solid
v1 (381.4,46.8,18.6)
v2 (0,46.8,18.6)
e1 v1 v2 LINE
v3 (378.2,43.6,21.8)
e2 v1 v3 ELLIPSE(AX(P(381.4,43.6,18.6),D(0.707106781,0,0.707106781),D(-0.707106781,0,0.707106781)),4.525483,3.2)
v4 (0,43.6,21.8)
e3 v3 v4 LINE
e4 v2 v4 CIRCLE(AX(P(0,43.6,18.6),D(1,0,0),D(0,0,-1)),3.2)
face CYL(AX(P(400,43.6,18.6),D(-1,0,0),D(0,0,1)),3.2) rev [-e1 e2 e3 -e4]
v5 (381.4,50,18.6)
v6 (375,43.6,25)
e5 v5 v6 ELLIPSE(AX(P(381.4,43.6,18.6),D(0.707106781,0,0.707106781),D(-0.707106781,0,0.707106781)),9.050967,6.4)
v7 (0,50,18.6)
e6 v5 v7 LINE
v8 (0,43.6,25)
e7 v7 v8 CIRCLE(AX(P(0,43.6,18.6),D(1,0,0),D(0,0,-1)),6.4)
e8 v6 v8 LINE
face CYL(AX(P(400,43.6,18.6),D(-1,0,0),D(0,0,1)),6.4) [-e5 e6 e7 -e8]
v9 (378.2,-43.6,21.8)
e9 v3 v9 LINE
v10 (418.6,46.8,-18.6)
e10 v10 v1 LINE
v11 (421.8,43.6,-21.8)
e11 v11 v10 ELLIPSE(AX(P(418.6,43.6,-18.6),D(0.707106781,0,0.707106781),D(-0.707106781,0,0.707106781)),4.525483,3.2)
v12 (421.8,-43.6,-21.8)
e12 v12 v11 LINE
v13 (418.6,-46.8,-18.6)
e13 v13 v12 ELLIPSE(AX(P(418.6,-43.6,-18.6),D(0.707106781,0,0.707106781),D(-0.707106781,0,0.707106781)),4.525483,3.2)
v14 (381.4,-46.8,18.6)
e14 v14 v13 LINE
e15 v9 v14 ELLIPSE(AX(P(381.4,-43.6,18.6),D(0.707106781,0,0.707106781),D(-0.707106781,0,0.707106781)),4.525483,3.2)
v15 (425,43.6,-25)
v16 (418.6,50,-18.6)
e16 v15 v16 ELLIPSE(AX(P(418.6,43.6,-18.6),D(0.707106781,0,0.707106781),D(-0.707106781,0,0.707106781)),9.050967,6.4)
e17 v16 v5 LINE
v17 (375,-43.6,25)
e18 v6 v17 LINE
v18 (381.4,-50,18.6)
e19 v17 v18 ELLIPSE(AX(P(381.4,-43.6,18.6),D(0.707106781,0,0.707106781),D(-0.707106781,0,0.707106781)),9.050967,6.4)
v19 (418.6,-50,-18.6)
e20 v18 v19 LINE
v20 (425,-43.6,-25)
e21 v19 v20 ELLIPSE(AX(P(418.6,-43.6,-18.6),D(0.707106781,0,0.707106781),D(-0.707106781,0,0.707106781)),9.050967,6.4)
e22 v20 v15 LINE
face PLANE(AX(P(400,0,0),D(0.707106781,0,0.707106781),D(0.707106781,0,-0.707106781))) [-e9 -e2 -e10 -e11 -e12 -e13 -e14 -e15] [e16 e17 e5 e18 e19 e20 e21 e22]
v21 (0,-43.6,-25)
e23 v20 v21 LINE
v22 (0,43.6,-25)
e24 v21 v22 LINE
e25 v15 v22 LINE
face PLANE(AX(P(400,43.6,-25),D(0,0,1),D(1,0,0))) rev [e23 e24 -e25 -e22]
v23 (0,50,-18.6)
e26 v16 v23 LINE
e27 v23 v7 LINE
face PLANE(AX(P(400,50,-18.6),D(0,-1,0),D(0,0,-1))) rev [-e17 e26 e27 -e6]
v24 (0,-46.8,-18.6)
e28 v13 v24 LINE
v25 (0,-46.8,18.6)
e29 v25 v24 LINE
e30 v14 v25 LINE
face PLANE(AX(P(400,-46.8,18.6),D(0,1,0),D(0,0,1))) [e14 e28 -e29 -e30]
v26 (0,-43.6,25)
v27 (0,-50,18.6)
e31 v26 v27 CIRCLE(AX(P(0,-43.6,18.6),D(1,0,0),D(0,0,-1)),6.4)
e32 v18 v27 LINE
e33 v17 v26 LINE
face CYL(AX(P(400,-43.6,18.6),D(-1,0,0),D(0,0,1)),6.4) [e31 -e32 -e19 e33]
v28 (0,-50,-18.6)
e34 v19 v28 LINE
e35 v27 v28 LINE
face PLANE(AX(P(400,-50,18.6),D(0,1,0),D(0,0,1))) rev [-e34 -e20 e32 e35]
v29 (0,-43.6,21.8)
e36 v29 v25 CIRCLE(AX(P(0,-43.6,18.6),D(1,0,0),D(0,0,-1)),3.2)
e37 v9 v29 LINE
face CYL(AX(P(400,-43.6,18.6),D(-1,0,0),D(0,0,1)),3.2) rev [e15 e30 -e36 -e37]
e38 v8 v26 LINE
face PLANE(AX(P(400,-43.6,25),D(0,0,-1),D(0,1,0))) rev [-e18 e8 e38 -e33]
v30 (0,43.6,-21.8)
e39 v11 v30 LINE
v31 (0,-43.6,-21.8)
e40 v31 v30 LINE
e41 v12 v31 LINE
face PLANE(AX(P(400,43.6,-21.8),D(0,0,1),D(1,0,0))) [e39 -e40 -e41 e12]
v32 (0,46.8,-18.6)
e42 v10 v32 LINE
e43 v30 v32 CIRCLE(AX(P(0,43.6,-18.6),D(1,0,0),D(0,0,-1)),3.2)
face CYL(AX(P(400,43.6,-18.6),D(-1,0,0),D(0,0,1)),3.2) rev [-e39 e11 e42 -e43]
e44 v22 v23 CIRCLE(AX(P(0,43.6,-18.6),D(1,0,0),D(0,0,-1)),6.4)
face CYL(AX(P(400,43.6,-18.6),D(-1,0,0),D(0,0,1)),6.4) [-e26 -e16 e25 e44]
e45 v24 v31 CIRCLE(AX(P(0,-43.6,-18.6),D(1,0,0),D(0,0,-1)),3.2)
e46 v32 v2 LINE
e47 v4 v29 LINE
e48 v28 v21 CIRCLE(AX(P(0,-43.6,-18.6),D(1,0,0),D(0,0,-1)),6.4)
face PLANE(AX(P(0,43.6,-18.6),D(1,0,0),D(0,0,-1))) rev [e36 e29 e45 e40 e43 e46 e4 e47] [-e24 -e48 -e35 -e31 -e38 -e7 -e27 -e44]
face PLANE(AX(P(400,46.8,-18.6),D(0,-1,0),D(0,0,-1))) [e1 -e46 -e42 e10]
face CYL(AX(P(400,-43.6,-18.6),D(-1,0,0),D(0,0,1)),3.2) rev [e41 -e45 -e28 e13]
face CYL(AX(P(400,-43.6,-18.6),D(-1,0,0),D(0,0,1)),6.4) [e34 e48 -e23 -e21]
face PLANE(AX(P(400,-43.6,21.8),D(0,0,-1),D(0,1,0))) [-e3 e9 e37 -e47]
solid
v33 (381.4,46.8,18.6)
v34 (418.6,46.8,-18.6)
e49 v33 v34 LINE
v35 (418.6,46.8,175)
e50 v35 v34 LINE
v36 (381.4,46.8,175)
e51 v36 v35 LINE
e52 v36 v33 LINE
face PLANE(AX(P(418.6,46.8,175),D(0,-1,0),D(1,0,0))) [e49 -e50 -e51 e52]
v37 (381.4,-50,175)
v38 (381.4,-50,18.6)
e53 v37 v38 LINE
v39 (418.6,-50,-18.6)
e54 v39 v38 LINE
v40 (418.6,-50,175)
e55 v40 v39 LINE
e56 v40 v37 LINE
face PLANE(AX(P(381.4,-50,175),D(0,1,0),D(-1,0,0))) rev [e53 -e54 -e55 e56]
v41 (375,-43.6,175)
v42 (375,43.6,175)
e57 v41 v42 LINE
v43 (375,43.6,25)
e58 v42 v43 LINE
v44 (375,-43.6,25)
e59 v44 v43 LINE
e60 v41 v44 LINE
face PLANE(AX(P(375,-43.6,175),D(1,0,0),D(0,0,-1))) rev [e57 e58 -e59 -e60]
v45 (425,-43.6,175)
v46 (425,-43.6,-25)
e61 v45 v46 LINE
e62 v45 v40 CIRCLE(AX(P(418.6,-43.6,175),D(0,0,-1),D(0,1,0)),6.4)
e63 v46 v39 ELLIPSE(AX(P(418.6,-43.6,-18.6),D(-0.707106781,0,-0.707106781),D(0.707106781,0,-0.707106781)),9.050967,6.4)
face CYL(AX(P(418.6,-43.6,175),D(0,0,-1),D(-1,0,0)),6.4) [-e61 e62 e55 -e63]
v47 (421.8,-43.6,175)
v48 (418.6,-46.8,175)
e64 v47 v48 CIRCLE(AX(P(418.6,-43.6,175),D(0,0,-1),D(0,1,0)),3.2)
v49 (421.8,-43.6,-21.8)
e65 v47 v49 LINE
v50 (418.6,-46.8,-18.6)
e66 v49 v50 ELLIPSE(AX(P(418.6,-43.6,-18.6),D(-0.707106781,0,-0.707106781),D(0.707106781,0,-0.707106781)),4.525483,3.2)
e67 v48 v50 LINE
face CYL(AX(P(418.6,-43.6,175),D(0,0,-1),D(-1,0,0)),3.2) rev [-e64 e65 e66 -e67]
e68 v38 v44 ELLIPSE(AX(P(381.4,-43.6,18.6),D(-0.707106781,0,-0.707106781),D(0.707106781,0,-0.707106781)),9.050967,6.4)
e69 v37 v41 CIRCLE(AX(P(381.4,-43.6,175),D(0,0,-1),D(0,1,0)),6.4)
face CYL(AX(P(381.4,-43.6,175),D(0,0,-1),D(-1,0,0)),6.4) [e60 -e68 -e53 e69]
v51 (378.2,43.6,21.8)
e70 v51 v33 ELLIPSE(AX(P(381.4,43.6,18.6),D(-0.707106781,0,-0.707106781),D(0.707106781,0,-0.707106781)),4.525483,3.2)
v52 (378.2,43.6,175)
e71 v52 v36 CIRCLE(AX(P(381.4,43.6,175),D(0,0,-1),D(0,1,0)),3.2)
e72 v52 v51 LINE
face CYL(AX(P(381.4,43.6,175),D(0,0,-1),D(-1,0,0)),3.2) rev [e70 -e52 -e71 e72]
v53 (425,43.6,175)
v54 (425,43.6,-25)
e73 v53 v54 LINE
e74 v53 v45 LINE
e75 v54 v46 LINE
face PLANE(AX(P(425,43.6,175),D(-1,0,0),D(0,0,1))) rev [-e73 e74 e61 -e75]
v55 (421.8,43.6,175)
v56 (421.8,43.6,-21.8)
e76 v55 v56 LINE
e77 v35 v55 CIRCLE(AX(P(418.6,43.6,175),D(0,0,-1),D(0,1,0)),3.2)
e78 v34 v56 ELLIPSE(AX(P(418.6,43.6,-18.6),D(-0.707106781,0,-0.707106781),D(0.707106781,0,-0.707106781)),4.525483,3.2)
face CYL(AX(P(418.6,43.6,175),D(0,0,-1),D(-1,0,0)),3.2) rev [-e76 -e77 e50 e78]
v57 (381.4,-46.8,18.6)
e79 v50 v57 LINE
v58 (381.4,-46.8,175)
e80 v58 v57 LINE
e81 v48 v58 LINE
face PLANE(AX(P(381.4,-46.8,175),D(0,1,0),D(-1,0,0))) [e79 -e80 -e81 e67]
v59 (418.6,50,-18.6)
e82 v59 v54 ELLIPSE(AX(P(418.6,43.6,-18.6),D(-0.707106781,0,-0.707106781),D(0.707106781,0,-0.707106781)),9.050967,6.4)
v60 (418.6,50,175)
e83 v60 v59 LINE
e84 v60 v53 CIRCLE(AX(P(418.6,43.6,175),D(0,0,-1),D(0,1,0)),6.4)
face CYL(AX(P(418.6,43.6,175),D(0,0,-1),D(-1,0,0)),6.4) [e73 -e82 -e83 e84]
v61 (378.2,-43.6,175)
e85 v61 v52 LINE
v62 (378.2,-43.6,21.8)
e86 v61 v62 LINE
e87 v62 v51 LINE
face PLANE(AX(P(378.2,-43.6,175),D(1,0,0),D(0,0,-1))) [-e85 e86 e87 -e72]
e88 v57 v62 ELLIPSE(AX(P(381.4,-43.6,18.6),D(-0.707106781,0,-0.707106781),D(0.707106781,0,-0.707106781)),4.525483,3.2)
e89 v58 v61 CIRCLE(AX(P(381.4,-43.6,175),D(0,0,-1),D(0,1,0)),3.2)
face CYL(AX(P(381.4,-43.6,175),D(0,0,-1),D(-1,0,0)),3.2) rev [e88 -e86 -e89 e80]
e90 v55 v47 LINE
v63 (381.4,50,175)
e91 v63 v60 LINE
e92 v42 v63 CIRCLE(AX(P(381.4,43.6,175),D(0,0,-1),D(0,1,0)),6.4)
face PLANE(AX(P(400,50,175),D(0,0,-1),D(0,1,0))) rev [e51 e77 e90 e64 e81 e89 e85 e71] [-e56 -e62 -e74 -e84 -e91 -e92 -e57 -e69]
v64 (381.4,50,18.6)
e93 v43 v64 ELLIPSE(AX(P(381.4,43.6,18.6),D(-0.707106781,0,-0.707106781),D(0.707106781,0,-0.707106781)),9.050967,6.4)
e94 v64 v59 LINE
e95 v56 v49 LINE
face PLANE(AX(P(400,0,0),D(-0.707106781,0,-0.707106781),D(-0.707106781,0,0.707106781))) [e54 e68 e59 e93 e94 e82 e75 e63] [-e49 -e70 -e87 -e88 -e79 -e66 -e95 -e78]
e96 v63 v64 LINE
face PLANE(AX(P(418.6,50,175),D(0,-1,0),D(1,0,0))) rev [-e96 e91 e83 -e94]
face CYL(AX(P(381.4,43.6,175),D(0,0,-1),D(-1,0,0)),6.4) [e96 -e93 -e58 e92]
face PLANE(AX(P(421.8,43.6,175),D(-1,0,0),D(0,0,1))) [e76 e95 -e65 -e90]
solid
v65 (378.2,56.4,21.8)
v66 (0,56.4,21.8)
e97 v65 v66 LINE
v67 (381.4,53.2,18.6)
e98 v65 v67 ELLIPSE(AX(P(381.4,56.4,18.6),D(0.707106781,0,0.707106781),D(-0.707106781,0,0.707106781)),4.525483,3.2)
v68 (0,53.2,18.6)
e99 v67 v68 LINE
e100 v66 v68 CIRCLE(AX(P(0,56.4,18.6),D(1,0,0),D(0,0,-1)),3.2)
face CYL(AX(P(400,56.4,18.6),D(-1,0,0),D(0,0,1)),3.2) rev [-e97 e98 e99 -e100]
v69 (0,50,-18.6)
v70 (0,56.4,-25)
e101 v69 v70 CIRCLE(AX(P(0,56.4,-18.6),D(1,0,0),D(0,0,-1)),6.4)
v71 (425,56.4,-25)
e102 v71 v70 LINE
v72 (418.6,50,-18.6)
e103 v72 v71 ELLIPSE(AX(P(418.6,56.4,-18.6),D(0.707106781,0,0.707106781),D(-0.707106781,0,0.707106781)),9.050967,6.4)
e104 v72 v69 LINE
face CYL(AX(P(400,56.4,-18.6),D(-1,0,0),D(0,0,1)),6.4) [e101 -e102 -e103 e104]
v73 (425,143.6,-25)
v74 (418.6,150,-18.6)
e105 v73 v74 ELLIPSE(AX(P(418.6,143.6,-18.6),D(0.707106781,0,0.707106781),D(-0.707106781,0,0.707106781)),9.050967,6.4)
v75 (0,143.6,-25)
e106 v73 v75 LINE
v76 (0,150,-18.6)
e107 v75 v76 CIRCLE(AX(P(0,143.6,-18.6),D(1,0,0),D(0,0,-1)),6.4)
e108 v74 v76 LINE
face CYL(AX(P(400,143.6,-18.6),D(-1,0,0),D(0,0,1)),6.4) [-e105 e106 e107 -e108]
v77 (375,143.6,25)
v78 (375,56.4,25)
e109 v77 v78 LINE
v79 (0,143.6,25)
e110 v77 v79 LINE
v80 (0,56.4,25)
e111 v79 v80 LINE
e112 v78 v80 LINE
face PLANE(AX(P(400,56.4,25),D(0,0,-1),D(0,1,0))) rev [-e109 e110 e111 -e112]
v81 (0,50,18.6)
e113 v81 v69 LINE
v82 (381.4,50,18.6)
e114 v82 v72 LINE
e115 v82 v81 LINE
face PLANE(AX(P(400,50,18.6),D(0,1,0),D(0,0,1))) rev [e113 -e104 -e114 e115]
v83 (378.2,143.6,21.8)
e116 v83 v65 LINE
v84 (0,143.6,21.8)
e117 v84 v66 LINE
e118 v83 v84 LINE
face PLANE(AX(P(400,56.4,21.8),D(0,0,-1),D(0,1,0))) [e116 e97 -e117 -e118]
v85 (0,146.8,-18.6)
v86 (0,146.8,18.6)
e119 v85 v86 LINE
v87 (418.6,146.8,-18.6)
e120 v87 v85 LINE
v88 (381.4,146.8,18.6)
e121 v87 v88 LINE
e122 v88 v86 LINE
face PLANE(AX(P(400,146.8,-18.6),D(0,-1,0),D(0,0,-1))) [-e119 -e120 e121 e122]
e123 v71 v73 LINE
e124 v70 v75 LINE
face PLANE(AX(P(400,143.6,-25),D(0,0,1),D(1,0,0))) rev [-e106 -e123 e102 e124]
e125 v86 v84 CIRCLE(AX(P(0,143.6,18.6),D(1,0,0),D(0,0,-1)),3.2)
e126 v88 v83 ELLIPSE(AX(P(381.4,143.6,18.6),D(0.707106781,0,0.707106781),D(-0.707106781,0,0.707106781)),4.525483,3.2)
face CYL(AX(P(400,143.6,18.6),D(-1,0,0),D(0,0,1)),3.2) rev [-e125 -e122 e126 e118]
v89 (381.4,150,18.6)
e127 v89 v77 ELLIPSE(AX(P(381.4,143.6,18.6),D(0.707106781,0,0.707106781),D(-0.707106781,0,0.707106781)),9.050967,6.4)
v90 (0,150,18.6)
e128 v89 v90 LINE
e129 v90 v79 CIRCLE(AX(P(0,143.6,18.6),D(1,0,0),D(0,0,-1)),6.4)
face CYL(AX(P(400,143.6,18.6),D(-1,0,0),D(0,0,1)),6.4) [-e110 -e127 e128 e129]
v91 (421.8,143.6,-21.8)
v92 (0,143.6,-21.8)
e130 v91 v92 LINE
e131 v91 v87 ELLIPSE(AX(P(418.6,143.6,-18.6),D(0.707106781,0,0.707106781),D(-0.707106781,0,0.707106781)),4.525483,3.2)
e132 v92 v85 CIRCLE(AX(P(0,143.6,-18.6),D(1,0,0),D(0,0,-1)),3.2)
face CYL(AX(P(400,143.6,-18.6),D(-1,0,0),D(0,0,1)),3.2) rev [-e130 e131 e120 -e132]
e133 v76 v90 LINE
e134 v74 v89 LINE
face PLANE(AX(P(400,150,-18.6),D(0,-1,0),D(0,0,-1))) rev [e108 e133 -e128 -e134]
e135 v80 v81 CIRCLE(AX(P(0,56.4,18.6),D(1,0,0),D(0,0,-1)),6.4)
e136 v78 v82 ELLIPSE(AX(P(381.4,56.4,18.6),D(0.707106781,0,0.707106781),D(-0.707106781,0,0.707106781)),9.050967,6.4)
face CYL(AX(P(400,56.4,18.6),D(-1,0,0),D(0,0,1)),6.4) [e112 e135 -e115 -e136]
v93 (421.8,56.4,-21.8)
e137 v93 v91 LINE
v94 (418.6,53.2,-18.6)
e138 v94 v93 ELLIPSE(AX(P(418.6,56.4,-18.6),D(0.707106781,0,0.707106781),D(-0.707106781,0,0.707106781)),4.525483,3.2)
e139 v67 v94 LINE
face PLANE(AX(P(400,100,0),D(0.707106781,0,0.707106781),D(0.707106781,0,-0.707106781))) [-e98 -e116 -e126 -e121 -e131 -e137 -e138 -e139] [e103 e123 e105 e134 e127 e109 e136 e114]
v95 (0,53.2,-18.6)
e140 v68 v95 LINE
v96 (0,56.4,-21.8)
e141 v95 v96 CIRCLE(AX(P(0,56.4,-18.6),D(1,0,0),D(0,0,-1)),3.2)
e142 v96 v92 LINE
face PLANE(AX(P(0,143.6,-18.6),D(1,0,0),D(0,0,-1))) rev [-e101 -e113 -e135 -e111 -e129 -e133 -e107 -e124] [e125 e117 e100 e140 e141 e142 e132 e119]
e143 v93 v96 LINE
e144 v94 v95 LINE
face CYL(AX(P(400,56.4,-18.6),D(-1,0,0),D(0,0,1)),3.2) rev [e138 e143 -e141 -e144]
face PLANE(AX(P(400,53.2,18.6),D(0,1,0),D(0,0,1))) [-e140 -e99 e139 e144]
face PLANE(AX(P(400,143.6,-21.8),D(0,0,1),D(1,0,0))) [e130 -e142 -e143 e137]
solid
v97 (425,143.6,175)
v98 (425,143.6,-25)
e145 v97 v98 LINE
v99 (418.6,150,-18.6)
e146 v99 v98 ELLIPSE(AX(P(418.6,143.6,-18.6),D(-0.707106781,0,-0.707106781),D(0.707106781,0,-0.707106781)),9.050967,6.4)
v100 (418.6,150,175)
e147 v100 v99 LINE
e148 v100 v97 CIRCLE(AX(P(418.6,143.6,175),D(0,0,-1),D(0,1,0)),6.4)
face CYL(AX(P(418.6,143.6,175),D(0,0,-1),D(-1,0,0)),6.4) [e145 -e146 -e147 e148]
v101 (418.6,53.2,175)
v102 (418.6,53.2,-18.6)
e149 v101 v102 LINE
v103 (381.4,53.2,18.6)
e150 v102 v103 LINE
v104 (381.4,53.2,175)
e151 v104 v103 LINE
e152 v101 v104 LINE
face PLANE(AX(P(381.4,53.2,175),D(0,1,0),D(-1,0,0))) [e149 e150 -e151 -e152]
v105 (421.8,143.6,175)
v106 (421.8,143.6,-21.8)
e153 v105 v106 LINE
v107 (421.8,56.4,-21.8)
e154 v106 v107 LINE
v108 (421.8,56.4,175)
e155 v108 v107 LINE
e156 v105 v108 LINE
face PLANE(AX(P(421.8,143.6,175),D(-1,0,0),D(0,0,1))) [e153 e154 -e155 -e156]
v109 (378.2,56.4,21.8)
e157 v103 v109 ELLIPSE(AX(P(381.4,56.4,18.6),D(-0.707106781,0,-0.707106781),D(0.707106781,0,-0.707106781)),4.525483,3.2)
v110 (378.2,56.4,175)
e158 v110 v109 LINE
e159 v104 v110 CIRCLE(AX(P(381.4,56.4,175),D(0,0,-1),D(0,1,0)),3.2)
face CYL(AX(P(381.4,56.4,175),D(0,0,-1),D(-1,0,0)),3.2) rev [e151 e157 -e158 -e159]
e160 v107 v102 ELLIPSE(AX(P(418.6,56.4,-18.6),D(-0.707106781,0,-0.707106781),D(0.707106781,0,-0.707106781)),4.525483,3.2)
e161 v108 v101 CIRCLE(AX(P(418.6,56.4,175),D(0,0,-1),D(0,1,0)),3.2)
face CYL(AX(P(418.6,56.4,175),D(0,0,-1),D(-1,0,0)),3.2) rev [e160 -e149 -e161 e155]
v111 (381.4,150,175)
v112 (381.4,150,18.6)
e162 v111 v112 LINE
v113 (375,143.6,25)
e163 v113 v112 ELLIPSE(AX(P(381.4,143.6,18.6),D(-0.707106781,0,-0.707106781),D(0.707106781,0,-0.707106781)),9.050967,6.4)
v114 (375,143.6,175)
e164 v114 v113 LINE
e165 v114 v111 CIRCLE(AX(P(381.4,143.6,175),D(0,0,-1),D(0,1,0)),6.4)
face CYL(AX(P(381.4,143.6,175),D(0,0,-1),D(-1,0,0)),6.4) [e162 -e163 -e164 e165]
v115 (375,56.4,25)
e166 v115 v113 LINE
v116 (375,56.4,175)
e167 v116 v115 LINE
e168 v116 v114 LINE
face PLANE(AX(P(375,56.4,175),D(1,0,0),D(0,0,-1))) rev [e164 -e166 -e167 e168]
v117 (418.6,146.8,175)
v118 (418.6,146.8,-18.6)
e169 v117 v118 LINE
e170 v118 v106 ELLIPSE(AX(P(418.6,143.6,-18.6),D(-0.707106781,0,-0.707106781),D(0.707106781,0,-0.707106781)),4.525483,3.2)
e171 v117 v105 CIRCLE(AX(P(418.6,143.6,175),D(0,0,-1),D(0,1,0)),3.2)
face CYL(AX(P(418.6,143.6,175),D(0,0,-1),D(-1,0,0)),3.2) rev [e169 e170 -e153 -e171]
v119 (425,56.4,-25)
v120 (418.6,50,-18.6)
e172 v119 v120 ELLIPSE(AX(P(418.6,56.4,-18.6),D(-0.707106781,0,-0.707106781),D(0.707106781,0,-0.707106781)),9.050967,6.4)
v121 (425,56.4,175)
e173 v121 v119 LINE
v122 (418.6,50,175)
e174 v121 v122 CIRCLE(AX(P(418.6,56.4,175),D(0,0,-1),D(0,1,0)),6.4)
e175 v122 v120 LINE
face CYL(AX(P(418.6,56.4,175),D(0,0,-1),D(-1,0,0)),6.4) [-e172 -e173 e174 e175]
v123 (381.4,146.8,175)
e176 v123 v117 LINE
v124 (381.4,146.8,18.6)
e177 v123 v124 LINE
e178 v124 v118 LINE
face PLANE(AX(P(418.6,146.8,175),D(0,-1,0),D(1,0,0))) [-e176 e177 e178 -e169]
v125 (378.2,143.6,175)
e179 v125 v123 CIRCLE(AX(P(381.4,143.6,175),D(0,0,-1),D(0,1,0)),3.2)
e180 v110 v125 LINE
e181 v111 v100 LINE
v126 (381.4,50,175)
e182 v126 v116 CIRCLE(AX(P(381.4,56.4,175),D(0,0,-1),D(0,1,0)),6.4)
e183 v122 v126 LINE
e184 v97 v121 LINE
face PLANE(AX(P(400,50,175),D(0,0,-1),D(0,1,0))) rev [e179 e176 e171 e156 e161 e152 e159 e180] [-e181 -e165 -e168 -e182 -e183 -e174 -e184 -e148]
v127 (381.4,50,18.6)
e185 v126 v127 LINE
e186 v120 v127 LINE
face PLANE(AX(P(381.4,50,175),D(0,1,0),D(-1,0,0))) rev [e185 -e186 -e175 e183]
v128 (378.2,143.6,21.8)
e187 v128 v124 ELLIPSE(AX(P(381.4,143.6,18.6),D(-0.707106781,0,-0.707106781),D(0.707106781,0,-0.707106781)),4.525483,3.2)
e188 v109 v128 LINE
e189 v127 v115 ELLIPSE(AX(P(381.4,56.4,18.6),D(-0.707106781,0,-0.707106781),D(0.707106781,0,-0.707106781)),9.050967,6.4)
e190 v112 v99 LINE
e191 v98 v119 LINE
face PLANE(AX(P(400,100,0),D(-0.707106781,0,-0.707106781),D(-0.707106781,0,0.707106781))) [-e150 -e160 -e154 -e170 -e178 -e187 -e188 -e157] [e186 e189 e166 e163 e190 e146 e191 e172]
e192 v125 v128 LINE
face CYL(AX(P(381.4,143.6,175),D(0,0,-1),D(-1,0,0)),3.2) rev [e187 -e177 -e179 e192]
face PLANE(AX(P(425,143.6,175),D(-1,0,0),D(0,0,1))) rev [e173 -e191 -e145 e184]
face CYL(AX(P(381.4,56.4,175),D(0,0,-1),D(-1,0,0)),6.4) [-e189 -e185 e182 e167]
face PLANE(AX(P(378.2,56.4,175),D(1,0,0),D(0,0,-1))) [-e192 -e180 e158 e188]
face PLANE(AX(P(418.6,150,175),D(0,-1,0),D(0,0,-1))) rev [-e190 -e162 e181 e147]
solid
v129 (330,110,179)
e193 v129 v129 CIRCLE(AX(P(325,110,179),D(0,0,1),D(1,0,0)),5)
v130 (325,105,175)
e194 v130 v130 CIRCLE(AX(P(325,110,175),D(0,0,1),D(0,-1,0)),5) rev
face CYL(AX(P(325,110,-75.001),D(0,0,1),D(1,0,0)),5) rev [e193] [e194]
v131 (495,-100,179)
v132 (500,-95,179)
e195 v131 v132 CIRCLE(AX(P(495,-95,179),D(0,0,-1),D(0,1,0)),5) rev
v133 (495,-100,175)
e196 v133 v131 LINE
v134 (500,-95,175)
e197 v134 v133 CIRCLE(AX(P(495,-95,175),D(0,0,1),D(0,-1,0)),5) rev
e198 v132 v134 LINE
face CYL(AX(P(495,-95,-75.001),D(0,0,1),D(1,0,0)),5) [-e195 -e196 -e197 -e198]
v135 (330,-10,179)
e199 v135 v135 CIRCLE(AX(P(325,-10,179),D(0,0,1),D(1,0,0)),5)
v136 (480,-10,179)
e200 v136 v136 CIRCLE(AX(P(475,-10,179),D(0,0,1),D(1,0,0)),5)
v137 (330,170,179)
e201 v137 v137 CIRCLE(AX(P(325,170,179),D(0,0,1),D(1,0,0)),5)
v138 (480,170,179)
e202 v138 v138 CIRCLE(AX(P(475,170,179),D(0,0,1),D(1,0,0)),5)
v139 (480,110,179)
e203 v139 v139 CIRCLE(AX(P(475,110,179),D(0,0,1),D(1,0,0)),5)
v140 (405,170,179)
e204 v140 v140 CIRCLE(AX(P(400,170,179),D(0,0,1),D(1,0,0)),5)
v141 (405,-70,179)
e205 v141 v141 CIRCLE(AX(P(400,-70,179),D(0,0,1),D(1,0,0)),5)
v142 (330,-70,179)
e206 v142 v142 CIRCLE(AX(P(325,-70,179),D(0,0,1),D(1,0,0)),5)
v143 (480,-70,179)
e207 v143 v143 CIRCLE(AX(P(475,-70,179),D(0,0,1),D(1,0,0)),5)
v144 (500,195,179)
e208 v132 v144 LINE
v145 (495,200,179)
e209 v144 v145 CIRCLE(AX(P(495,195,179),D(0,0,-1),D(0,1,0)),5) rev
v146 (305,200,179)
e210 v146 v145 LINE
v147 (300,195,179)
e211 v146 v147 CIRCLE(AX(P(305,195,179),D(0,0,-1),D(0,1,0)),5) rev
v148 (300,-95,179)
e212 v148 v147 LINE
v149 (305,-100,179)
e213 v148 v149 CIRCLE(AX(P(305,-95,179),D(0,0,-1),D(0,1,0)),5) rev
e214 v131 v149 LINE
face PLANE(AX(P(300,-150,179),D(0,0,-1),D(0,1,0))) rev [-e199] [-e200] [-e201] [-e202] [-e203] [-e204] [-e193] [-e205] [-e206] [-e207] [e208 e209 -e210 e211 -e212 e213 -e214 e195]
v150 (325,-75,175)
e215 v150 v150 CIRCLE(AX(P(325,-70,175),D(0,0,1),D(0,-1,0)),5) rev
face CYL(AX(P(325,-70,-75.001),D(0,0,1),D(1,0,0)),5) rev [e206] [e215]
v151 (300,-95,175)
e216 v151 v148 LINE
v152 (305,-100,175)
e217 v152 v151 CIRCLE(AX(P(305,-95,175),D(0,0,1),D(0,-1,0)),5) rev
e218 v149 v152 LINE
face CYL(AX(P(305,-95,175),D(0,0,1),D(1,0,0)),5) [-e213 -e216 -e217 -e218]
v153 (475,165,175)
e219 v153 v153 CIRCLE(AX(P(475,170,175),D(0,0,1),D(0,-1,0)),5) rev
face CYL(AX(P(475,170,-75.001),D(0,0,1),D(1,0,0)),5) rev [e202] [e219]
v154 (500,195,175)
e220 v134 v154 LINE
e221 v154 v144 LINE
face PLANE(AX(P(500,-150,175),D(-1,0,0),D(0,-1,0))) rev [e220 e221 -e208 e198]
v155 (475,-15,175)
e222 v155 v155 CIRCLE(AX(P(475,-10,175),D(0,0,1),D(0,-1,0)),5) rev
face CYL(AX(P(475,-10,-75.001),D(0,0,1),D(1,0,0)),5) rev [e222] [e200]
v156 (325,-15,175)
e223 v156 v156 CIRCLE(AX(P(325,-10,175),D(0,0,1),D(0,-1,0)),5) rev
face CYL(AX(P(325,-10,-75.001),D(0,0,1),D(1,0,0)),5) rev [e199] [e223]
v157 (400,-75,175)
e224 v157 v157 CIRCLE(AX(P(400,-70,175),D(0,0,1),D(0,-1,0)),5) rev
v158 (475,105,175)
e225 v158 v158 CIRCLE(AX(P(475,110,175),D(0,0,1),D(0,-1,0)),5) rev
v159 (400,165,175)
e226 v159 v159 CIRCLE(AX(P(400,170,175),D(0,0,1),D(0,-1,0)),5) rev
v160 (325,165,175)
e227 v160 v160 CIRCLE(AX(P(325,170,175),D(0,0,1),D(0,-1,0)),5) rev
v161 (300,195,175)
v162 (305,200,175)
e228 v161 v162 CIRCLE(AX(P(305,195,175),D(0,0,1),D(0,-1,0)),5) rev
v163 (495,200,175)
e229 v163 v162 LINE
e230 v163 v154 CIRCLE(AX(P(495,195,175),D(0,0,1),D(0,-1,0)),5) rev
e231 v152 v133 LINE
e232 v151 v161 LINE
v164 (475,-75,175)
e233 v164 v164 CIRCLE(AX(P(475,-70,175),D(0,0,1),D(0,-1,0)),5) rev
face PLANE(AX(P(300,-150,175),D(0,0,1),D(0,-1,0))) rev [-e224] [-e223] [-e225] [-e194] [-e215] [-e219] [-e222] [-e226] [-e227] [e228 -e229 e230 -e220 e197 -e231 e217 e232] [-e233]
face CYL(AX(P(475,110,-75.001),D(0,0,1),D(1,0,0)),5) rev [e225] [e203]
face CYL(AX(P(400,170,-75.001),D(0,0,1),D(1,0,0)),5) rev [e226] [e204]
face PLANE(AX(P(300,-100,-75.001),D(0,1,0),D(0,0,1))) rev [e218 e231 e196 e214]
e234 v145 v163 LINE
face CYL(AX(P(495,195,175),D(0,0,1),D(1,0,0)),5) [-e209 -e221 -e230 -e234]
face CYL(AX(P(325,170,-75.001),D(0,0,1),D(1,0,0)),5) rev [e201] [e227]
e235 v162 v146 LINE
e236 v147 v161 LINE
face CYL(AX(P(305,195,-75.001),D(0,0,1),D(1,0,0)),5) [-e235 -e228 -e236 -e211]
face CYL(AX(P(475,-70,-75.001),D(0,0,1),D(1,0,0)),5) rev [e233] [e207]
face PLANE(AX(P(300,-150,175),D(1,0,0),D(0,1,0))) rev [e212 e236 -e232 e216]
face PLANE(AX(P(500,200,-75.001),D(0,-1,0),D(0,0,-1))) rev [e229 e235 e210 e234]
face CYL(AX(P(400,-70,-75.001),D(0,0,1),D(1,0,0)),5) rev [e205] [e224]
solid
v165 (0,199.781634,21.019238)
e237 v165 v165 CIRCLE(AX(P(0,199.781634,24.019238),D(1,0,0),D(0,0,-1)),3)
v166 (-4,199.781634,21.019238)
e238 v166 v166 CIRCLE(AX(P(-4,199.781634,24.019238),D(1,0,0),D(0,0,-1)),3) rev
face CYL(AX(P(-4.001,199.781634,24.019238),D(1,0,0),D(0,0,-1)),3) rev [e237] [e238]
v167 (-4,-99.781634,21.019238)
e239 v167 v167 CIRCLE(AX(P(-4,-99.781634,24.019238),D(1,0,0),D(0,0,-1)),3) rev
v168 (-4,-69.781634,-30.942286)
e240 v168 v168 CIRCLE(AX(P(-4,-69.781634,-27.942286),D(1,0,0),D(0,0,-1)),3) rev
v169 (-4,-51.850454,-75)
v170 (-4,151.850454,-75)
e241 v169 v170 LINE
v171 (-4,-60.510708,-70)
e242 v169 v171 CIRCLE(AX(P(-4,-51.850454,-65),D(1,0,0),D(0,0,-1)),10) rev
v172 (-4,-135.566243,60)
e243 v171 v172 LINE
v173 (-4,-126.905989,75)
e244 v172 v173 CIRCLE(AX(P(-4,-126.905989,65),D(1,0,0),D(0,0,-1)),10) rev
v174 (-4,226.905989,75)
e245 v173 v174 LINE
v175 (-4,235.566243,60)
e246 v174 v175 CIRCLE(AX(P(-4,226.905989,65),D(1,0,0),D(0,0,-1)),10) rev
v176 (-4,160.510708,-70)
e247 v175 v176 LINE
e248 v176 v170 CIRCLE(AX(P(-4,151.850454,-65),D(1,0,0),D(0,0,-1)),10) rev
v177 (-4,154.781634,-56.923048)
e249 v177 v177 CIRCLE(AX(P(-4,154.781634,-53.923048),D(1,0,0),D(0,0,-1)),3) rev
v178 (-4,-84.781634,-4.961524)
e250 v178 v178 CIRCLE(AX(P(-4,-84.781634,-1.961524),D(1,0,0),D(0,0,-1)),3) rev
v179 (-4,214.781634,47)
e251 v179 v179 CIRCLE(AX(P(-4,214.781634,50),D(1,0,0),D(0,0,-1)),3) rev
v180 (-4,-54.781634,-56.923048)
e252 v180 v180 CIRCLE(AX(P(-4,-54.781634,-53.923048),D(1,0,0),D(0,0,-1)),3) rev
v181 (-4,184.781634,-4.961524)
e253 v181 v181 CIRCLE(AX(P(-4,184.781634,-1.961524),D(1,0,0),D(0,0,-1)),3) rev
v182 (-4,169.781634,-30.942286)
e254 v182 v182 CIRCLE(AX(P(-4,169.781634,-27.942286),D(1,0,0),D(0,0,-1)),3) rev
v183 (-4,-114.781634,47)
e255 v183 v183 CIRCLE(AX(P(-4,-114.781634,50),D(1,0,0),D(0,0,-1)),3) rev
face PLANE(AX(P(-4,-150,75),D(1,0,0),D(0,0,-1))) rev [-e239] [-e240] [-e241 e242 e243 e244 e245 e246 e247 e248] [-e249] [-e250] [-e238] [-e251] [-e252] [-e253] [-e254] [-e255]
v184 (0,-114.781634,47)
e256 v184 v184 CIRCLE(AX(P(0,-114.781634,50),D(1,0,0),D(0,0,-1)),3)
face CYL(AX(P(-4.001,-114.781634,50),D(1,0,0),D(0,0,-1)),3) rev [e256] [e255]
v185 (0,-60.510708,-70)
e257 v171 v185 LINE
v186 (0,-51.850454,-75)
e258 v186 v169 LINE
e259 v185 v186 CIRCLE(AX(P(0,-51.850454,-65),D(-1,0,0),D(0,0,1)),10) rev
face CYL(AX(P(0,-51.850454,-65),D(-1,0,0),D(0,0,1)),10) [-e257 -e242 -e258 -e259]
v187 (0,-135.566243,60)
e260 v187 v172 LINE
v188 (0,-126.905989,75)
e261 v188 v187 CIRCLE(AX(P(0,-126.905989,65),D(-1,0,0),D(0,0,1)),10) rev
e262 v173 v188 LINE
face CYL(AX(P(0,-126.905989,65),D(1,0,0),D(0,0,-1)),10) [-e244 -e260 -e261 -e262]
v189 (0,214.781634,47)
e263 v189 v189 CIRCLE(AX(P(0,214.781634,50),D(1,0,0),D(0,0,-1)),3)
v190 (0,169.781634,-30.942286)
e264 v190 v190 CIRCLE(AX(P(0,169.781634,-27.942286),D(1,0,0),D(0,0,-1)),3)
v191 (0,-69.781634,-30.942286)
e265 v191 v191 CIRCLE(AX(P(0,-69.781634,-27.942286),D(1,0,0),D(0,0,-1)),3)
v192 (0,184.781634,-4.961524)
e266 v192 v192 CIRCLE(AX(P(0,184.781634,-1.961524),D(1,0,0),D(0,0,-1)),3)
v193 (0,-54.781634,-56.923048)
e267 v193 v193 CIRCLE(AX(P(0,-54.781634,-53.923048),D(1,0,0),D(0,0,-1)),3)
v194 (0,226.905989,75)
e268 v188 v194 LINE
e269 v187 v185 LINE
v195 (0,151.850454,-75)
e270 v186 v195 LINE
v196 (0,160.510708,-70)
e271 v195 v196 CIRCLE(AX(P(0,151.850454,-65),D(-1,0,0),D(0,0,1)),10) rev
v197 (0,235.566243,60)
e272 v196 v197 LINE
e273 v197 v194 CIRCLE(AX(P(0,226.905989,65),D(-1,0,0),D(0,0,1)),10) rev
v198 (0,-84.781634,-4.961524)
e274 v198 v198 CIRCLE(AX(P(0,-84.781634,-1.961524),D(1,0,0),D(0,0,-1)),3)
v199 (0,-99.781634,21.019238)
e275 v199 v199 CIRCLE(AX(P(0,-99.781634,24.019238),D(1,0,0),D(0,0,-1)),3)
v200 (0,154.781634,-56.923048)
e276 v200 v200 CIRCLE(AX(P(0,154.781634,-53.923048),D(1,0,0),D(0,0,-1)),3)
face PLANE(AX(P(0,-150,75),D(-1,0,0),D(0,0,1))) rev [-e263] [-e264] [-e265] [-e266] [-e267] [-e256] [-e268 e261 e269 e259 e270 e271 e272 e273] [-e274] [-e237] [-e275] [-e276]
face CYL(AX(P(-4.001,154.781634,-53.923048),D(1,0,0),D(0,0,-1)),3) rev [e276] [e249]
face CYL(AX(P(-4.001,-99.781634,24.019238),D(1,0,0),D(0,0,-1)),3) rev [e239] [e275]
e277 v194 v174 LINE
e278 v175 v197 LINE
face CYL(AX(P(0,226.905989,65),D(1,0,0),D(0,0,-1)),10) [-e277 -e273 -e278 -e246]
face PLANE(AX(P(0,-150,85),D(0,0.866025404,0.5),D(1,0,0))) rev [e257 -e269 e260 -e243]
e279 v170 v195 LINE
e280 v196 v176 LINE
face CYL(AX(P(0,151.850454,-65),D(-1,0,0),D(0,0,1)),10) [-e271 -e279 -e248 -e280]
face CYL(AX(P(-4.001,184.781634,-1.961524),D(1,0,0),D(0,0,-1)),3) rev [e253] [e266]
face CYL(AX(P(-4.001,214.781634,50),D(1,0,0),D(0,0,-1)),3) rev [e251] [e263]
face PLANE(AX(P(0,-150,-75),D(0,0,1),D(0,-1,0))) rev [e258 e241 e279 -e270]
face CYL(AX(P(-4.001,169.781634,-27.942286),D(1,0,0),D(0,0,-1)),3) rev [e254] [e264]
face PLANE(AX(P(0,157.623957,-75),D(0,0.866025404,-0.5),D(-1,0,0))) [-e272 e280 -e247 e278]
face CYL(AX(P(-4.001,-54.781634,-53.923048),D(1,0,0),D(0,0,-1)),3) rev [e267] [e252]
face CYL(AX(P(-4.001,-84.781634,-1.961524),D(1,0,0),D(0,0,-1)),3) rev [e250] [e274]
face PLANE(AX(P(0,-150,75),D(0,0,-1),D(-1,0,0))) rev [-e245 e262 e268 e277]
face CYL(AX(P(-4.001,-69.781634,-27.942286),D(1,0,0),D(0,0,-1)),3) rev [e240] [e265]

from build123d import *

# Parameters (mm, degrees)
TUBE_RECTANGULAR_100_X_50_X_3_2_3_DEPTH   = 456.901699437
TUBE_RECTANGULAR_100_X_50_X_3_2_3_2_DEPTH = 231.901699437
TUBE_RECTANGULAR_100_X_50_X_3_2_4_DEPTH   = 456.901699437
TUBE_RECTANGULAR_100_X_50_X_3_2_4_2_DEPTH = 231.901699437
BOSS_EXTRUDE1_DEPTH                       = 100
BOSS_EXTRUDE1_DEPTH_BACK                  = 300
SKETCH18_W                                = 200
SKETCH18_H                                = 4
BOSS_EXTRUDE1_2_DEPTH                     = 100
BOSS_EXTRUDE1_2_DEPTH_BACK                = 300
SKETCH18_W_2                              = 4
SKETCH18_H_2                              = 150
CHAMFER1_SIZE                             = 160
CHAMFER1_SIZE_2                           = 92.37604307
CHAMFER2_SIZE                             = 160
CHAMFER2_SIZE_2                           = 92.37604307
SKETCH21_R                                = 5
SKETCH21_W                                = 200.4
SKETCH21_H                                = 50
SKETCH21_W_2                              = 200
CUT_EXTRUDE2_DEPTH                        = 4
FILLET6_R                                 = 5
FILLET8_R                                 = 10
SKETCH22_R                                = 3
CUT_EXTRUDE3_DEPTH                        = 4


with BuildPart() as part:
    # Sketch11 → Tube (rectangular) 100 X 50 X 3.2(3) (new body)
    with BuildSketch(Plane(origin=(0, 0, 0), x_dir=(0, 0, -1), z_dir=(1, 0, 0))):
        with BuildLine():
            Line((-18.6, -50), (18.6, -50))
            ThreePointArc((18.6, -50), (23.1254834, -48.1254834), (25, -43.6))
            Line((25, -43.6), (25, 43.6))
            ThreePointArc((25, 43.6), (23.1254834, 48.1254834), (18.6, 50))
            Line((18.6, 50), (-18.6, 50))
            ThreePointArc((-18.6, 50), (-23.1254834, 48.1254834), (-25, 43.6))
            Line((-25, 43.6), (-25, -43.6))
            ThreePointArc((-25, -43.6), (-23.1254834, -48.1254834), (-18.6, -50))
        make_face()
        with BuildLine():
            Line((-18.6, -46.8), (18.6, -46.8))
            ThreePointArc((18.6, -46.8), (20.8627417, -45.8627417), (21.8, -43.6))
            Line((21.8, -43.6), (21.8, 43.6))
            ThreePointArc((21.8, 43.6), (20.8627417, 45.8627417), (18.6, 46.8))
            Line((18.6, 46.8), (-18.6, 46.8))
            ThreePointArc((-18.6, 46.8), (-20.8627417, 45.8627417), (-21.8, 43.6))
            Line((-21.8, 43.6), (-21.8, -43.6))
            ThreePointArc((-21.8, -43.6), (-20.8627417, -45.8627417), (-18.6, -46.8))
        make_face(mode=Mode.SUBTRACT)
    extrude(amount=TUBE_RECTANGULAR_100_X_50_X_3_2_3_DEPTH)

    # Tube (rectangular) 100 X 50 X 3.2(3) mitr
    split(bisect_by=Plane(origin=(400, 0, 0), x_dir=(0, -1, 0), z_dir=(-0.707106781, 0, -0.707106781)), keep=Keep.TOP)


with BuildPart() as body_2:
    # Sketch11 on segment 2 (carried to segment 2) → Tube _rectangular_ 100 X 50 X 3.2_3 2 (new body)
    with BuildSketch(Plane(origin=(400, 0, -56.901699437), x_dir=(1, 0, 0), z_dir=(0, 0, 1))):
        with BuildLine():
            Line((-18.6, -50), (18.6, -50))
            ThreePointArc((18.6, -50), (23.1254834, -48.1254834), (25, -43.6))
            Line((25, -43.6), (25, 43.6))
            ThreePointArc((25, 43.6), (23.1254834, 48.1254834), (18.6, 50))
            Line((18.6, 50), (-18.6, 50))
            ThreePointArc((-18.6, 50), (-23.1254834, 48.1254834), (-25, 43.6))
            Line((-25, 43.6), (-25, -43.6))
            ThreePointArc((-25, -43.6), (-23.1254834, -48.1254834), (-18.6, -50))
        make_face()
        with BuildLine():
            Line((-18.6, -46.8), (18.6, -46.8))
            ThreePointArc((18.6, -46.8), (20.8627417, -45.8627417), (21.8, -43.6))
            Line((21.8, -43.6), (21.8, 43.6))
            ThreePointArc((21.8, 43.6), (20.8627417, 45.8627417), (18.6, 46.8))
            Line((18.6, 46.8), (-18.6, 46.8))
            ThreePointArc((-18.6, 46.8), (-20.8627417, 45.8627417), (-21.8, 43.6))
            Line((-21.8, 43.6), (-21.8, -43.6))
            ThreePointArc((-21.8, -43.6), (-20.8627417, -45.8627417), (-18.6, -46.8))
        make_face(mode=Mode.SUBTRACT)
    extrude(amount=TUBE_RECTANGULAR_100_X_50_X_3_2_3_2_DEPTH)

    # Tube _rectangular_ 100 X 50 X 3.2_3 2 mi
    split(bisect_by=Plane(origin=(400, 0, 0), x_dir=(0, 1, 0), z_dir=(0.707106781, 0, 0.707106781)), keep=Keep.TOP)


with BuildPart() as body_3:
    # Sketch14 → Tube (rectangular) 100 X 50 X 3.2(4) (new body)
    with BuildSketch(Plane(origin=(0, 100, 0), x_dir=(0, 0, -1), z_dir=(1, 0, 0))):
        with BuildLine():
            Line((-18.6, -50), (18.6, -50))
            ThreePointArc((18.6, -50), (23.1254834, -48.1254834), (25, -43.6))
            Line((25, -43.6), (25, 43.6))
            ThreePointArc((25, 43.6), (23.1254834, 48.1254834), (18.6, 50))
            Line((18.6, 50), (-18.6, 50))
            ThreePointArc((-18.6, 50), (-23.1254834, 48.1254834), (-25, 43.6))
            Line((-25, 43.6), (-25, -43.6))
            ThreePointArc((-25, -43.6), (-23.1254834, -48.1254834), (-18.6, -50))
        make_face()
        with BuildLine():
            Line((-18.6, -46.8), (18.6, -46.8))
            ThreePointArc((18.6, -46.8), (20.8627417, -45.8627417), (21.8, -43.6))
            Line((21.8, -43.6), (21.8, 43.6))
            ThreePointArc((21.8, 43.6), (20.8627417, 45.8627417), (18.6, 46.8))
            Line((18.6, 46.8), (-18.6, 46.8))
            ThreePointArc((-18.6, 46.8), (-20.8627417, 45.8627417), (-21.8, 43.6))
            Line((-21.8, 43.6), (-21.8, -43.6))
            ThreePointArc((-21.8, -43.6), (-20.8627417, -45.8627417), (-18.6, -46.8))
        make_face(mode=Mode.SUBTRACT)
    extrude(amount=TUBE_RECTANGULAR_100_X_50_X_3_2_4_DEPTH)

    # Tube (rectangular) 100 X 50 X 3.2(4) mitr
    split(bisect_by=Plane(origin=(400, 100, 0), x_dir=(0, -1, 0), z_dir=(-0.707106781, 0, -0.707106781)), keep=Keep.TOP)


with BuildPart() as body_4:
    # Sketch14 on segment 2 (carried to segment 2) → Tube _rectangular_ 100 X 50 X 3.2_4 2 (new body)
    with BuildSketch(Plane(origin=(400, 100, -56.901699437), x_dir=(1, 0, 0), z_dir=(0, 0, 1))):
        with BuildLine():
            Line((-18.6, -50), (18.6, -50))
            ThreePointArc((18.6, -50), (23.1254834, -48.1254834), (25, -43.6))
            Line((25, -43.6), (25, 43.6))
            ThreePointArc((25, 43.6), (23.1254834, 48.1254834), (18.6, 50))
            Line((18.6, 50), (-18.6, 50))
            ThreePointArc((-18.6, 50), (-23.1254834, 48.1254834), (-25, 43.6))
            Line((-25, 43.6), (-25, -43.6))
            ThreePointArc((-25, -43.6), (-23.1254834, -48.1254834), (-18.6, -50))
        make_face()
        with BuildLine():
            Line((-18.6, -46.8), (18.6, -46.8))
            ThreePointArc((18.6, -46.8), (20.8627417, -45.8627417), (21.8, -43.6))
            Line((21.8, -43.6), (21.8, 43.6))
            ThreePointArc((21.8, 43.6), (20.8627417, 45.8627417), (18.6, 46.8))
            Line((18.6, 46.8), (-18.6, 46.8))
            ThreePointArc((-18.6, 46.8), (-20.8627417, 45.8627417), (-21.8, 43.6))
            Line((-21.8, 43.6), (-21.8, -43.6))
            ThreePointArc((-21.8, -43.6), (-20.8627417, -45.8627417), (-18.6, -46.8))
        make_face(mode=Mode.SUBTRACT)
    extrude(amount=TUBE_RECTANGULAR_100_X_50_X_3_2_4_2_DEPTH)

    # Tube _rectangular_ 100 X 50 X 3.2_4 2 mi
    split(bisect_by=Plane(origin=(400, 100, 0), x_dir=(0, 1, 0), z_dir=(0.707106781, 0, 0.707106781)), keep=Keep.TOP)


with BuildPart() as body_5:
    # Sketch18 → Boss-Extrude1 (new, two sides: drawn at the far end of the back side and taken through both)
    with BuildSketch(Plane.XZ.offset(50).offset(-BOSS_EXTRUDE1_DEPTH_BACK)):
        with Locations((400, 177)):
            Rectangle(SKETCH18_W, SKETCH18_H)
    extrude(amount=BOSS_EXTRUDE1_DEPTH + BOSS_EXTRUDE1_DEPTH_BACK)

    # Sketch21 → Cut-Extrude2 (cut)
    with BuildSketch(Plane.XY.offset(179)):
        with Locations((325, 170)):
            Circle(SKETCH21_R)
        with Locations((400, 170)):
            Circle(SKETCH21_R)
        with Locations((475, 170)):
            Circle(SKETCH21_R)
        with Locations((400, -70)):
            Circle(SKETCH21_R)
        with Locations((475, -70)):
            Circle(SKETCH21_R)
        with Locations((325, -70)):
            Circle(SKETCH21_R)
        with Locations((325, 110)):
            Circle(SKETCH21_R)
        with Locations((475, 110)):
            Circle(SKETCH21_R)
        with Locations((325, -10)):
            Circle(SKETCH21_R)
        with Locations((475, -10)):
            Circle(SKETCH21_R)
        with Locations((399.8, 225)):
            Rectangle(SKETCH21_W, SKETCH21_H)
        with Locations((400, -125)):
            Rectangle(SKETCH21_W_2, SKETCH21_H)
    extrude(amount=-CUT_EXTRUDE2_DEPTH, mode=Mode.SUBTRACT)

    # Fillet6
    fillet6_edges = [body_5.edges().sort_by_distance(p)[0] for p in [
        (300, -100, 177),
        (500, -100, 177),
        (500, 200, 177),
        (300, 200, 177),
    ]]
    fillet(fillet6_edges, radius=FILLET6_R)


with BuildPart() as body_6:
    # Sketch18 → Boss-Extrude1 2 (new, two sides: drawn at the far end of the back side and taken through both)
    with BuildSketch(Plane.XZ.offset(50).offset(-BOSS_EXTRUDE1_2_DEPTH_BACK)):
        with Locations((-2, 0)):
            Rectangle(SKETCH18_W_2, SKETCH18_H_2)
    extrude(amount=BOSS_EXTRUDE1_2_DEPTH + BOSS_EXTRUDE1_2_DEPTH_BACK)

    # Chamfer1
    # the kernel refuses this chamfer: 160, 92.37604307 mm, written as the material it takes off along each edge
    with BuildSketch(Plane(origin=(-417.933720743, 250, -75), x_dir=(0, 0.019326765612700983, 0.9998132206222079), z_dir=(1, 0, 0))) as chamfer1_piece_1:
        Polygon((CHAMFER1_SIZE * 0.999813220622, CHAMFER1_SIZE * 0.0193267656127), (-CHAMFER1_SIZE_2 * 0.0193267656128, CHAMFER1_SIZE_2 * 0.999813220626), (0, 0), align=None)
    extrude(amount=831.867441487, mode=Mode.SUBTRACT)

    # Chamfer2
    # the kernel refuses this chamfer: 160, 92.37604307 mm, written as the material it takes off along each edge
    with BuildSketch(Plane(origin=(-417.933720743, -150, -75), x_dir=(0, -0.019326765612700636, 0.9998132206222079), z_dir=(1, 0, 0))) as chamfer2_piece_1:
        Polygon((CHAMFER2_SIZE * 0.999813220622, -CHAMFER2_SIZE * 0.0193267656127), (-CHAMFER2_SIZE_2 * 0.0193267656128, -CHAMFER2_SIZE_2 * 0.999813220626), (0, 0), align=None)
    extrude(amount=831.867441487, mode=Mode.SUBTRACT)

    # Fillet8
    fillet8_edges = [body_6.edges().sort_by_distance(p)[0] for p in [
        (-2, 157.62395693, -75),
        (-2, 244.226497308, 75),
        (-2, -144.226497308, 75),
        (-2, -57.62395693, -75),
    ]]
    fillet(fillet8_edges, radius=FILLET8_R)

    # Sketch22 → Cut-Extrude3 (cut)
    with BuildSketch(Plane(origin=(0, 0, 0), x_dir=(0, 0, -1), z_dir=(1, 0, 0))):
        with Locations((-50, -114.781633579)):
            Circle(SKETCH22_R)
        with Locations((-24.019237886, -99.781633579)):
            Circle(SKETCH22_R)
        with Locations((1.961524227, -84.781633579)):
            Circle(SKETCH22_R)
        with Locations((27.942286341, -69.781633579)):
            Circle(SKETCH22_R)
        with Locations((53.923048454, -54.781633579)):
            Circle(SKETCH22_R)
        with Locations((-50, 214.781633579)):
            Circle(SKETCH22_R)
        with Locations((-24.019237886, 199.781633579)):
            Circle(SKETCH22_R)
        with Locations((1.961524227, 184.781633579)):
            Circle(SKETCH22_R)
        with Locations((27.942286341, 169.781633579)):
            Circle(SKETCH22_R)
        with Locations((53.923048454, 154.781633579)):
            Circle(SKETCH22_R)
    extrude(amount=-CUT_EXTRUDE3_DEPTH, mode=Mode.SUBTRACT)


solid = Compound([part.part, body_2.part, body_3.part, body_4.part, body_5.part, body_6.part])
